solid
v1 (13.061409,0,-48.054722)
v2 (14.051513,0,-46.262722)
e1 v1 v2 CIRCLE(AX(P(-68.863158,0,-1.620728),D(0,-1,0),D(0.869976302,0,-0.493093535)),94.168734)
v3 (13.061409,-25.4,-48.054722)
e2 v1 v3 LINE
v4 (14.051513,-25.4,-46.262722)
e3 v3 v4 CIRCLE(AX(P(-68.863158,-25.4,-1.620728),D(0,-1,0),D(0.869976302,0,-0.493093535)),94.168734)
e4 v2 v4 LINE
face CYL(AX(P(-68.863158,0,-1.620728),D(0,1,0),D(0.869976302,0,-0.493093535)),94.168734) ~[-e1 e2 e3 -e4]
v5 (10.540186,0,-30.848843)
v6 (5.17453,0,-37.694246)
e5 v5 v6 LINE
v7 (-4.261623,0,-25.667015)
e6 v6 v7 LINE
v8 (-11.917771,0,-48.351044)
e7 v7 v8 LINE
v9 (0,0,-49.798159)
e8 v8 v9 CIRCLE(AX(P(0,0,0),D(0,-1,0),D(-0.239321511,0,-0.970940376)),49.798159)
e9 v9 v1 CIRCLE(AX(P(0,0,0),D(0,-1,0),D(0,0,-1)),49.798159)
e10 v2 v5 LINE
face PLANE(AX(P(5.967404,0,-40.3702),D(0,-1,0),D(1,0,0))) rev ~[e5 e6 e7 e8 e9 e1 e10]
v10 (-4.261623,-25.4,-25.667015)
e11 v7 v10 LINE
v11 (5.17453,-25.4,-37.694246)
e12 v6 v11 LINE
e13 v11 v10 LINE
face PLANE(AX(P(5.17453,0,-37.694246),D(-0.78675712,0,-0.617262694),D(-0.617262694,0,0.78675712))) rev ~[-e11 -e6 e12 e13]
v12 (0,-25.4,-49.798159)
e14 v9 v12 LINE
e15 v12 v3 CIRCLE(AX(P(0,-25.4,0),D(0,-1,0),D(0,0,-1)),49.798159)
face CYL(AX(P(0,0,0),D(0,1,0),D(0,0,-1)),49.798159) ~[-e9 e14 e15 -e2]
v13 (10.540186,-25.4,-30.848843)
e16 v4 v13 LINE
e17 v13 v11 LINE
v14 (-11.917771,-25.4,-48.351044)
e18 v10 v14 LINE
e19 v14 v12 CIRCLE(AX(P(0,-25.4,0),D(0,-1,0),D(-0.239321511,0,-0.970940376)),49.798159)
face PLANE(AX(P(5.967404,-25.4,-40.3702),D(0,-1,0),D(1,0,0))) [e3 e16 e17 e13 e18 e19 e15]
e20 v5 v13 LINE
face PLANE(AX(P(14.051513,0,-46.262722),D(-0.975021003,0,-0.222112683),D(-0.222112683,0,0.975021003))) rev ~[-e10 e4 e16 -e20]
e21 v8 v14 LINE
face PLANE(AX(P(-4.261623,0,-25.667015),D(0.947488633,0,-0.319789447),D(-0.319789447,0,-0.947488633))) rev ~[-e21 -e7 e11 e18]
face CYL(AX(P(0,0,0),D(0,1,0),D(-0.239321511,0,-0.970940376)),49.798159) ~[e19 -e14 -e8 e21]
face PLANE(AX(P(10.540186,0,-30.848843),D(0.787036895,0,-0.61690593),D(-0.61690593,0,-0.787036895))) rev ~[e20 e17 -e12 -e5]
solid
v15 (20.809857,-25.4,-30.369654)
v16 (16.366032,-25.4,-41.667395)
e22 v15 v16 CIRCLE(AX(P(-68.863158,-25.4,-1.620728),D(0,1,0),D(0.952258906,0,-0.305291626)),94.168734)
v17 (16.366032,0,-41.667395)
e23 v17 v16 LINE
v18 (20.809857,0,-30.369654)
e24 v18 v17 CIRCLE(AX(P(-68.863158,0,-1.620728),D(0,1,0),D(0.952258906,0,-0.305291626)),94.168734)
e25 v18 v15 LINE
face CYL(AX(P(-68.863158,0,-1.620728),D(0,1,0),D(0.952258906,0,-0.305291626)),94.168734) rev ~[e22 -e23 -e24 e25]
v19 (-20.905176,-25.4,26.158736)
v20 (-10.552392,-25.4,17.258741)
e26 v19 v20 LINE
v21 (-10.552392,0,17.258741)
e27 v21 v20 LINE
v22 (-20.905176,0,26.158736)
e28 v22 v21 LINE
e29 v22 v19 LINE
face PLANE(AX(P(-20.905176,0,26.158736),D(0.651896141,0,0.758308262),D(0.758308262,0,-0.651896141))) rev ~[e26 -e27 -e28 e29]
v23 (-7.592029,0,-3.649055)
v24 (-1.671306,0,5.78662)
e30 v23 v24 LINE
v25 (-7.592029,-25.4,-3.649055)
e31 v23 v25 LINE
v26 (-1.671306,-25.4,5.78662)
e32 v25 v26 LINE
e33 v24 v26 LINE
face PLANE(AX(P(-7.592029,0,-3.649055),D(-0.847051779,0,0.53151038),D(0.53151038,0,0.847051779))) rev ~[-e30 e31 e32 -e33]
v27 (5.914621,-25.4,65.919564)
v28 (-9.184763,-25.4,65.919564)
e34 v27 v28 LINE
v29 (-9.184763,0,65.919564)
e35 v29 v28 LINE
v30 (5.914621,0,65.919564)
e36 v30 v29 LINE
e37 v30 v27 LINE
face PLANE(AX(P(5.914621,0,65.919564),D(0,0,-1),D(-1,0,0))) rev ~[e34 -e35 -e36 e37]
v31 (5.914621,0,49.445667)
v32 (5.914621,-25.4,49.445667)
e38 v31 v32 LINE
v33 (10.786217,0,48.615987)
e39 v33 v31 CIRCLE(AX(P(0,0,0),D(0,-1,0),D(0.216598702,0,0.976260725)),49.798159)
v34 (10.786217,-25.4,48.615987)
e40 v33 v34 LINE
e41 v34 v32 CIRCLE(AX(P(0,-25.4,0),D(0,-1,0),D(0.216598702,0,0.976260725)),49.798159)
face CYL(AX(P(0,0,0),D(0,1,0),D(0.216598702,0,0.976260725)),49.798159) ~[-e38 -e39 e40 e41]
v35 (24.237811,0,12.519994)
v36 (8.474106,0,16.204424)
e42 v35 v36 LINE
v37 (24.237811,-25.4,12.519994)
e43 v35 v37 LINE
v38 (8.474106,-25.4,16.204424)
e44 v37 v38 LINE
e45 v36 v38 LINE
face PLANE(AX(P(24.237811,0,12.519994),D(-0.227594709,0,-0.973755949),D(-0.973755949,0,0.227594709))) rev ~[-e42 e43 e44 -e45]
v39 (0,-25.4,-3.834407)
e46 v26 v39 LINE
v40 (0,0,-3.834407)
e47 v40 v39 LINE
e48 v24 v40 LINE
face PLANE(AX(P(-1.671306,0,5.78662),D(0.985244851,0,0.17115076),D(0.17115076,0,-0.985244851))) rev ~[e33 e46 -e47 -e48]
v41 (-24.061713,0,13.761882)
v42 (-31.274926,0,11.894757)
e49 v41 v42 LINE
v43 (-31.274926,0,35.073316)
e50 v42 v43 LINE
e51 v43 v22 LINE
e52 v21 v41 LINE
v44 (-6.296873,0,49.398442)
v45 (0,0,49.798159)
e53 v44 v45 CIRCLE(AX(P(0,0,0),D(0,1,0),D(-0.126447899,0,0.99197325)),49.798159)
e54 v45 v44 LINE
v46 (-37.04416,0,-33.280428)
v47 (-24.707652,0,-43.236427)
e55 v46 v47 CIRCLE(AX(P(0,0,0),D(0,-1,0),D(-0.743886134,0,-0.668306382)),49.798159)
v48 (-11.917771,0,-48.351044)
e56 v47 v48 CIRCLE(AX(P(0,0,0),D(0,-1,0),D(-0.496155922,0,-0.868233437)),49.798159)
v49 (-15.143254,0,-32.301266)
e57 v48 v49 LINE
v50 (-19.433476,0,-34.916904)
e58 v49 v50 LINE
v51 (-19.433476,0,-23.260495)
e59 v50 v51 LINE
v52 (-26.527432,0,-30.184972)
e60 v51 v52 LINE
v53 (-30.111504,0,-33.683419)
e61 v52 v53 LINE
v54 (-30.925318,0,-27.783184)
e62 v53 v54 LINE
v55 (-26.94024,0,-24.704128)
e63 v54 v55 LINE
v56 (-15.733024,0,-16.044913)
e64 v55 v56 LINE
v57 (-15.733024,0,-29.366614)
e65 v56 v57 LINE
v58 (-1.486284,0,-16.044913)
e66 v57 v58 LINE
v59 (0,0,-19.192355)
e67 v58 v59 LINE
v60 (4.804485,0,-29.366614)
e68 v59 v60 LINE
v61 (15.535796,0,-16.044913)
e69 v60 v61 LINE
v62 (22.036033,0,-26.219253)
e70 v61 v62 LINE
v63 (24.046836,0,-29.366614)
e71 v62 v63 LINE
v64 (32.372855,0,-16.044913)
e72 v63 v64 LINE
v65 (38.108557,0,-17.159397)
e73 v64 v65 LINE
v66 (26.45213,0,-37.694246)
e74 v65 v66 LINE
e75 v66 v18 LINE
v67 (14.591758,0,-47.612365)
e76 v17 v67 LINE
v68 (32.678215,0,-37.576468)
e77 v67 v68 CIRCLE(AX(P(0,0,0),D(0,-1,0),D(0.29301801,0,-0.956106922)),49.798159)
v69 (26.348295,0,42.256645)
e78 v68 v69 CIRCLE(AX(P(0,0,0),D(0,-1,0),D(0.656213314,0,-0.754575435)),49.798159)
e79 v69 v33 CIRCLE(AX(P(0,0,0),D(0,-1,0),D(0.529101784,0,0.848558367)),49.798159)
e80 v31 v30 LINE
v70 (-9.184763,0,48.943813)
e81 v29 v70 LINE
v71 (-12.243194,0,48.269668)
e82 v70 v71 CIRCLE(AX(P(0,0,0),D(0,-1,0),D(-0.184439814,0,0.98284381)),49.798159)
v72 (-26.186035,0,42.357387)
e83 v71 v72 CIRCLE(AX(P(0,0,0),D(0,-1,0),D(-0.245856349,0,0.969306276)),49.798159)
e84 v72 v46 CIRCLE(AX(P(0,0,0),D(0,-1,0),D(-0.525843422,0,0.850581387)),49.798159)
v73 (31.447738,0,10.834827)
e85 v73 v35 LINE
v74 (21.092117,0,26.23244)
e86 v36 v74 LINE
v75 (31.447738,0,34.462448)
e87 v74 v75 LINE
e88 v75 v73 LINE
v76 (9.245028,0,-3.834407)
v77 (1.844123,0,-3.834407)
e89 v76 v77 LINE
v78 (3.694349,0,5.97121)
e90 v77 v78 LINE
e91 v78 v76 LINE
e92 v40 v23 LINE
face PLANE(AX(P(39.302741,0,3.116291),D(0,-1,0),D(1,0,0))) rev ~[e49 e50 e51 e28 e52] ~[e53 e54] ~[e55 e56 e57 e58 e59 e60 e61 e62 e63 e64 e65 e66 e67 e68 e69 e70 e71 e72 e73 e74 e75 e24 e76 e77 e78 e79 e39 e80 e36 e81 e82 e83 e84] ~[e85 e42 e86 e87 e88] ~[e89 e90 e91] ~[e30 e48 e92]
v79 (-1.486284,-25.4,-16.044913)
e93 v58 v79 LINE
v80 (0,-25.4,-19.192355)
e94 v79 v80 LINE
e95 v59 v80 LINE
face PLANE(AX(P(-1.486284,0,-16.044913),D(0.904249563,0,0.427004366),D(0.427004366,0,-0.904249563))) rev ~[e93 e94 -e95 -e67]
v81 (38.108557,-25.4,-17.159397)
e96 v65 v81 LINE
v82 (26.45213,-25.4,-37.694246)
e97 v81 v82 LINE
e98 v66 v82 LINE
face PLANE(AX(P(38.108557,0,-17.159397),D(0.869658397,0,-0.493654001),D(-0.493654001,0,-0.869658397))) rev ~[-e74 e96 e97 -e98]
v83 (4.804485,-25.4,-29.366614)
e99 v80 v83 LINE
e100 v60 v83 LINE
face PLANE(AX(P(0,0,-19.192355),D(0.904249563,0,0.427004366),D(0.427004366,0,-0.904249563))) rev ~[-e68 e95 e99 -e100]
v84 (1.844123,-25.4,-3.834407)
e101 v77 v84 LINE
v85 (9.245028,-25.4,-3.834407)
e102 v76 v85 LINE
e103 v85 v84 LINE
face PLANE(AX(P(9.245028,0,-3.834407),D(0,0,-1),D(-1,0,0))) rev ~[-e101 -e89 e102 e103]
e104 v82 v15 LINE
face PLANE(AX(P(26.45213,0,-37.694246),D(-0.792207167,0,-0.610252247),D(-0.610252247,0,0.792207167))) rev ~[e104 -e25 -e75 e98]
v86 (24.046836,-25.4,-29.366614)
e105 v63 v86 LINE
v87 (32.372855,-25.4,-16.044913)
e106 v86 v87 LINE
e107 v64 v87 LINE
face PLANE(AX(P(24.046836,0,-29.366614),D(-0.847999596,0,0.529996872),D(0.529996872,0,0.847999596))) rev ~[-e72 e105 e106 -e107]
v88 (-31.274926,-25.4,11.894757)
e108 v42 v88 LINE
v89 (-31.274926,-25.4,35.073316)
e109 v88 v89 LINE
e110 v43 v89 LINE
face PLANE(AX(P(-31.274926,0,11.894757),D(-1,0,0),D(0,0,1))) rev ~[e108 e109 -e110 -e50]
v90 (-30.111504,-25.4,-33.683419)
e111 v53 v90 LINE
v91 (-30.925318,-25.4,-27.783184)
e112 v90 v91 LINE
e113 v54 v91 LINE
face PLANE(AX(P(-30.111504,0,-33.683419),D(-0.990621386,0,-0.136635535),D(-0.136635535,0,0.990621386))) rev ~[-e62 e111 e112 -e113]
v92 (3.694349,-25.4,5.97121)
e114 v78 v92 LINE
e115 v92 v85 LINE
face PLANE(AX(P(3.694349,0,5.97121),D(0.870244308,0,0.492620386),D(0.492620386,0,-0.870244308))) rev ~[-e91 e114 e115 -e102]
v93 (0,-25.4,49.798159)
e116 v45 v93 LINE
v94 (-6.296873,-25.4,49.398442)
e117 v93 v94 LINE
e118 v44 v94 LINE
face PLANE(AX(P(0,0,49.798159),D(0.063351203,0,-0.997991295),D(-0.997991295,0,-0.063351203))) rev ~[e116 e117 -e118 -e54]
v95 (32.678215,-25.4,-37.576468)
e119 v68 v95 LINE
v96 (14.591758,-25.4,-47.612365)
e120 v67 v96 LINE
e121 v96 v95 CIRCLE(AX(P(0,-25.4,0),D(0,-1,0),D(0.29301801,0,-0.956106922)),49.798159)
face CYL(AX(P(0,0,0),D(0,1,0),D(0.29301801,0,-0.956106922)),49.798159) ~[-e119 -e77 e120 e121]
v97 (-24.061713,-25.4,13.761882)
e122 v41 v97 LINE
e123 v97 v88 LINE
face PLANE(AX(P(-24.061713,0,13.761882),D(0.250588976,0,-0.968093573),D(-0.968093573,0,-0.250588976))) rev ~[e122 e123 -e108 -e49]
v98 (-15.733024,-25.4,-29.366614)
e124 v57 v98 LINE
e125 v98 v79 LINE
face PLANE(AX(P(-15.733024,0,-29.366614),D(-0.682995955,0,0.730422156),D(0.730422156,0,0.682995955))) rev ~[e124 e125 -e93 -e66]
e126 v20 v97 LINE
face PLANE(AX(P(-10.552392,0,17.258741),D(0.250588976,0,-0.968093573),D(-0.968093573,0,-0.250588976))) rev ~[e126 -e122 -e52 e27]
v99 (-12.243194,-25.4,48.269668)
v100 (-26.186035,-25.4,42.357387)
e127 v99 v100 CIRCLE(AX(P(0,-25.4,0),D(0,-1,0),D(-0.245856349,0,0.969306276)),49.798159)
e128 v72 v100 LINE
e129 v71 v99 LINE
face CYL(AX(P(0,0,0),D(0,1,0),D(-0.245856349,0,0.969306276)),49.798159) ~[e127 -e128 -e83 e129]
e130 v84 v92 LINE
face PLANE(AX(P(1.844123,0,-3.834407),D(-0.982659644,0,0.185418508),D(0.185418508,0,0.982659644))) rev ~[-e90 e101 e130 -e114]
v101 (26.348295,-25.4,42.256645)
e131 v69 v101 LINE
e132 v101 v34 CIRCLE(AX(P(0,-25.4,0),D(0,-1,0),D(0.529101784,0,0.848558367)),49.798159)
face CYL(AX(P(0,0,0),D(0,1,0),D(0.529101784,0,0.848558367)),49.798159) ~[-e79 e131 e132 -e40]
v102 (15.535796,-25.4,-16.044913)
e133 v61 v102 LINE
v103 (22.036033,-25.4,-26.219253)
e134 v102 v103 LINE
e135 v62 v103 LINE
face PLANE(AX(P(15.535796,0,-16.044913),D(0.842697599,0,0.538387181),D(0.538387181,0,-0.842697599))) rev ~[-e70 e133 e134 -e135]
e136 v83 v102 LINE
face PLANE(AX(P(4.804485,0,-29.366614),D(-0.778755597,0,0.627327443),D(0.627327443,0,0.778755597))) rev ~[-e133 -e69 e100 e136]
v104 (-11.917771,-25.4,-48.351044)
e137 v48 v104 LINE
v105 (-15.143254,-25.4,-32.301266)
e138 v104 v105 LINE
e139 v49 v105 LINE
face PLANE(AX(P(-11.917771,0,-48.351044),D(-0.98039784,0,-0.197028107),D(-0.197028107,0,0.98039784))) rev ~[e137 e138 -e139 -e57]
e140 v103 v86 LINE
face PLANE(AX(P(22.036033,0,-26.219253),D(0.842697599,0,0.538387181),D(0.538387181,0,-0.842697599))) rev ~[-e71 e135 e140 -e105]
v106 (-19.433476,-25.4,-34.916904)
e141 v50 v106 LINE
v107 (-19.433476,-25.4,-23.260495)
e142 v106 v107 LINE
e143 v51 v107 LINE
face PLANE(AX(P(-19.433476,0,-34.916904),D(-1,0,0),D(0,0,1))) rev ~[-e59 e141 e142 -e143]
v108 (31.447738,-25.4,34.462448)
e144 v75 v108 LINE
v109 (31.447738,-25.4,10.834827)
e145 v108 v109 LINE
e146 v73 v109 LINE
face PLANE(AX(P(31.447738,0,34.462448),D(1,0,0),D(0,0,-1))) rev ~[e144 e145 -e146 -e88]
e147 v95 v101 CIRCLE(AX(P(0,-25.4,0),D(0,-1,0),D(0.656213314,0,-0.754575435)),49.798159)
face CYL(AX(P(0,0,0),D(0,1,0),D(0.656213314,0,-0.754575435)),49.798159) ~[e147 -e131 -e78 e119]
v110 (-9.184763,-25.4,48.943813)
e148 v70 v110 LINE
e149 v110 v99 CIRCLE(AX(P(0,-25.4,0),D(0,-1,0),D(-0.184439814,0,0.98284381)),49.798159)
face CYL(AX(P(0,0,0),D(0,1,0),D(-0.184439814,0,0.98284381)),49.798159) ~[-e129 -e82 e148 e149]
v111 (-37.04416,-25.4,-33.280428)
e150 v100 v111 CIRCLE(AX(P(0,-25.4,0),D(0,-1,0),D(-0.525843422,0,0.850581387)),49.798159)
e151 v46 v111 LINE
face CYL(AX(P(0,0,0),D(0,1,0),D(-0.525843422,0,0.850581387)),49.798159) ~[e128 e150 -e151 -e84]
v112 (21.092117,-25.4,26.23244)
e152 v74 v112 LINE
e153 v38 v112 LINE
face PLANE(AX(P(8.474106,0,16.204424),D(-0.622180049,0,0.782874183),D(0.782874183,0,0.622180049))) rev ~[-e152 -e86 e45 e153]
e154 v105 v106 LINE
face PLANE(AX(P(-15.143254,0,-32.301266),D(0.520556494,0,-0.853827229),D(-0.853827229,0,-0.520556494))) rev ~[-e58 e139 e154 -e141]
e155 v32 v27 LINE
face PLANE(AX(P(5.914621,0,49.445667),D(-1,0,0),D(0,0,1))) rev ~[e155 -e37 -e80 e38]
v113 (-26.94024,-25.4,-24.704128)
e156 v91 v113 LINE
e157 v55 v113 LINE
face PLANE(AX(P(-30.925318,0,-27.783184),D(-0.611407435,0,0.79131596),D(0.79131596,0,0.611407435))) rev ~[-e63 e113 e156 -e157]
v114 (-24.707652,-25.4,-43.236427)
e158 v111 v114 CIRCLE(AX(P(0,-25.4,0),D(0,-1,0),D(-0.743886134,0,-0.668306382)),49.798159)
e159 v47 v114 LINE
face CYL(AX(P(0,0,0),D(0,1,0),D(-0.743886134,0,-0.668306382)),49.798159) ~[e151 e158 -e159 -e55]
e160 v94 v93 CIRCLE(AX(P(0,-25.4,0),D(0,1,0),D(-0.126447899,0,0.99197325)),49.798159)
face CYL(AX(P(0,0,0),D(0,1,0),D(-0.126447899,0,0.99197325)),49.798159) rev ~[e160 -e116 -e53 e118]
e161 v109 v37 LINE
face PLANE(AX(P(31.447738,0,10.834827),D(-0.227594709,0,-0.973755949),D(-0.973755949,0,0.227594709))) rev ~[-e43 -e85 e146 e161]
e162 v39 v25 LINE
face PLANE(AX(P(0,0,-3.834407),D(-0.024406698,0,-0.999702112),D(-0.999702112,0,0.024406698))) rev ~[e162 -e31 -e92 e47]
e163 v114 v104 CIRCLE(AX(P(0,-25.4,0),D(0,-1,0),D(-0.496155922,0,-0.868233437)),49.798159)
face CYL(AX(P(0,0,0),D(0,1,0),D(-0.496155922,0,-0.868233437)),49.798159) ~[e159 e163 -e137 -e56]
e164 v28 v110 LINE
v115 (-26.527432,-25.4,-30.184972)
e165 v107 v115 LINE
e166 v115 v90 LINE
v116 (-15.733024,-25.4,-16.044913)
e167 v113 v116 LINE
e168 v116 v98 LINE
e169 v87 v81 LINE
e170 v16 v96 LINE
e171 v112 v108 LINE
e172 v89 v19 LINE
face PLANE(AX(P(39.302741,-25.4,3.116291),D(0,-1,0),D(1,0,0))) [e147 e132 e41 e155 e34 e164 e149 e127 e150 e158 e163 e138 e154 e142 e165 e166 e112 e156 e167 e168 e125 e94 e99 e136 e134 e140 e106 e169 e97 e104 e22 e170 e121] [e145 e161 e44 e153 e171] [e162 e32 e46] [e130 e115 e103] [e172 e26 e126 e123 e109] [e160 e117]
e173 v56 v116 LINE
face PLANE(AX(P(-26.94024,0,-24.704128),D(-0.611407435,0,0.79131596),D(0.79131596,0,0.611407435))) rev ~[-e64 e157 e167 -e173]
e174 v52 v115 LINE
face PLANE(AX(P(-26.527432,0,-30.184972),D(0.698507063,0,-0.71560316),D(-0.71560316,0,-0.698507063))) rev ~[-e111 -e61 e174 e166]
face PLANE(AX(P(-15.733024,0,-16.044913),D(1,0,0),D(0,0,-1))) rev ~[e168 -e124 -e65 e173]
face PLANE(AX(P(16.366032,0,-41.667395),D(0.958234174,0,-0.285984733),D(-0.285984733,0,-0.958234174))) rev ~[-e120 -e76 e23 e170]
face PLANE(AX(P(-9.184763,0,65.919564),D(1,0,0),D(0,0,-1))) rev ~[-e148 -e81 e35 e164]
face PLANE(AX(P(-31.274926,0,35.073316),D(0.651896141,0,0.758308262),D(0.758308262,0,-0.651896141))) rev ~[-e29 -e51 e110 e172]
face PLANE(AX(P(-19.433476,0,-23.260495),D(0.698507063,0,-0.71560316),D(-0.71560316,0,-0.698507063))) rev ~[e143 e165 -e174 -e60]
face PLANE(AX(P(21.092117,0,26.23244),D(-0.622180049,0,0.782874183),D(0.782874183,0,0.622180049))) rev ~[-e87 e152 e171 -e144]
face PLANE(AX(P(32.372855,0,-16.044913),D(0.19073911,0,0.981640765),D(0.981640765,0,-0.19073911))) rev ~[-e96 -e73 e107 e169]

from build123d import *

# Parameters (mm, degrees)
F1_DEPTH = 25.4


with BuildPart() as f1:
    # F0 (on Front) → F1 (new body)
    with BuildSketch(Plane.XZ):
        with BuildLine():
            ThreePointArc((32.6782151723, -37.5764677752), (45.3165071723, -20.6463278819), (49.7981593767, 0))
            ThreePointArc((49.7981593767, 0), (43.5428138182, 24.1636098732), (26.3482949877, 42.2566447857))
            ThreePointArc((26.3482949877, 42.2566447857), (42.3711325354, 3.3595819889), (32.6782151723, -37.5764677752))
        make_face()
        with BuildLine():
            ThreePointArc((32.6782151723, -37.5764677752), (42.3711325354, 3.3595819889), (26.3482949877, 42.2566447857))
            ThreePointArc((26.3482949877, 42.2566447857), (18.8375502119, 46.0977589403), (10.7862166768, 48.6159871555))
            ThreePointArc((10.7862166768, 48.6159871555), (16.6744949948, 37.7627754895), (21.092116807, 26.232439738))
            Line((21.092116807, 26.232439738), (31.447738409, 34.4624482095))
            Line((31.447738409, 34.4624482095), (31.447738409, 10.8348272407))
            Line((31.447738409, 10.8348272407), (24.2378107652, 12.519994233))
            ThreePointArc((24.2378107652, 12.519994233), (25.1538459711, -6.9642629039), (22.0360332318, -26.2192529167))
            Line((22.0360332318, -26.2192529167), (24.0468364209, -29.366614297))
            Line((24.0468364209, -29.366614297), (32.37285465, -16.0449128598))
            Line((32.37285465, -16.0449128598), (38.1085574627, -17.1593967825))
            Line((38.1085574627, -17.1593967825), (26.4521297067, -37.6942455769))
            Line((26.4521297067, -37.6942455769), (20.8098572617, -30.369653677))
            ThreePointArc((20.8098572617, -30.369653677), (18.7701982142, -36.0902111883), (16.3660323787, -41.6673945191))
            Line((16.3660323787, -41.6673945191), (14.5917575654, -47.6123648694))
            ThreePointArc((14.5917575654, -47.6123648694), (24.1617960482, -43.5438203311), (32.6782151723, -37.5764677752))
        make_face()
        with BuildLine():
            ThreePointArc((21.092116807, 26.232439738), (16.6744949948, 37.7627754895), (10.7862166768, 48.6159871555))
            ThreePointArc((10.7862166768, 48.6159871555), (8.3607166752, 49.0912934642), (5.9146205895, 49.4456665502))
            ThreePointArc((5.9146205895, 49.4456665502), (2.9625575062, 49.70995806), (0, 49.7981593767))
            Line((0, 49.7981593767), (0, -3.8344066124))
            Line((0, -3.8344066124), (0, -19.1923552025))
            Line((0, -19.1923552025), (4.8044845462, -29.366614297))
            Line((4.8044845462, -29.366614297), (15.5357960612, -16.0449128598))
            Line((15.5357960612, -16.0449128598), (22.0360332318, -26.2192529167))
            ThreePointArc((22.0360332318, -26.2192529167), (25.1538459711, -6.9642629039), (24.2378107652, 12.519994233))
            Line((24.2378107652, 12.519994233), (8.4741063403, 16.204424325))
            Line((8.4741063403, 16.204424325), (21.092116807, 26.232439738))
        make_face()
        Polygon((9.245027788, -3.8344066124), (1.8441228895, -3.8344066124), (3.6943492014, 5.9712096117), align=None, mode=Mode.SUBTRACT)
        with BuildLine():
            ThreePointArc((0, 49.7981593767), (2.9625575062, 49.70995806), (5.9146205895, 49.4456665502))
            Line((5.9146205895, 49.4456665502), (5.9146205895, 65.9195636089))
            Line((5.9146205895, 65.9195636089), (3.1392811798, 65.9195636089))
            Line((3.1392811798, 65.9195636089), (0, 65.9195636089))
            Line((0, 65.9195636089), (0, 49.7981593767))
        make_face()
        with BuildLine():
            Line((0, -3.8344066124), (0, 49.7981593767))
            Line((0, 49.7981593767), (-6.296872627, 49.398442004))
            ThreePointArc((-6.296872627, 49.398442004), (-7.744154843, 49.1923240259), (-9.1847632403, 48.9438126991))
            ThreePointArc((-9.1847632403, 48.9438126991), (-10.7192794325, 48.6307898944), (-12.2431936307, 48.2696683957))
            ThreePointArc((-12.2431936307, 48.2696683957), (-17.0201913462, 37.3889257354), (-20.9051760668, 26.1587359893))
            Line((-20.9051760668, 26.1587359893), (-10.5523923412, 17.2587409616))
            Line((-10.5523923412, 17.2587409616), (-24.0617127081, 13.7618819272))
            ThreePointArc((-24.0617127081, 13.7618819272), (-26.7647104228, -5.37655391), (-26.9402397571, -24.7041277979))
            Line((-26.9402397571, -24.7041277979), (-15.7330241054, -16.0449128598))
            Line((-15.7330241054, -16.0449128598), (-15.7330241054, -29.366614297))
            Line((-15.7330241054, -29.366614297), (-1.4862839598, -16.0449128598))
            Line((-1.4862839598, -16.0449128598), (0, -19.1923552025))
            Line((0, -19.1923552025), (0, -3.8344066124))
        make_face()
        Polygon((-1.6713063233, 5.7866196148), (0, -3.8344066124), (-7.5920294039, -3.6490550265), align=None, mode=Mode.SUBTRACT)
        with BuildLine():
            ThreePointArc((-6.296872627, 49.398442004), (-3.1547733222, 49.6981295683), (0, 49.7981593767))
            Line((0, 49.7981593767), (0, 65.9195636089))
            Line((0, 65.9195636089), (-3.1484363135, 65.9195636089))
            Line((-3.1484363135, 65.9195636089), (-6.296872627, 65.9195636089))
            Line((-6.296872627, 65.9195636089), (-6.296872627, 49.398442004))
        make_face()
        with BuildLine():
            ThreePointArc((-9.1847632403, 48.9438126991), (-7.744154843, 49.1923240259), (-6.296872627, 49.398442004))
            Line((-6.296872627, 49.398442004), (-6.296872627, 65.9195636089))
            Line((-6.296872627, 65.9195636089), (-9.1847632403, 65.9195636089))
            Line((-9.1847632403, 65.9195636089), (-9.1847632403, 48.9438126991))
        make_face()
        with BuildLine():
            ThreePointArc((-24.7076516572, -43.2364270829), (-18.4904087752, -46.2380953396), (-11.9177707221, -48.3510436115))
            Line((-11.9177707221, -48.3510436115), (-15.1432544542, -32.3012661093))
            Line((-15.1432544542, -32.3012661093), (-19.4334760308, -34.9169038236))
            Line((-19.4334760308, -34.9169038236), (-19.4334760308, -23.2604946941))
            Line((-19.4334760308, -23.2604946941), (-26.5274317789, -30.1849724934))
            ThreePointArc((-26.5274317789, -30.1849724934), (-25.7634681206, -36.7310464832), (-24.7076516572, -43.2364270829))
        make_face()
        with BuildLine():
            ThreePointArc((-20.9051760668, 26.1587359893), (-17.0201913462, 37.3889257354), (-12.2431936307, 48.2696683957))
            ThreePointArc((-12.2431936307, 48.2696683957), (-19.4406831361, 45.8466630902), (-26.1860345343, 42.3573874628))
            ThreePointArc((-26.1860345343, 42.3573874628), (-41.8830905525, 6.0124933669), (-37.0441602385, -33.2804277246))
            ThreePointArc((-37.0441602385, -33.2804277246), (-31.2746230818, -38.7524789968), (-24.7076516572, -43.2364270829))
            ThreePointArc((-24.7076516572, -43.2364270829), (-25.7634681206, -36.7310464832), (-26.5274317789, -30.1849724934))
            Line((-26.5274317789, -30.1849724934), (-30.1115038325, -33.6834193751))
            Line((-30.1115038325, -33.6834193751), (-30.925318067, -27.7831842472))
            Line((-30.925318067, -27.7831842472), (-26.9402397571, -24.7041277979))
            ThreePointArc((-26.9402397571, -24.7041277979), (-26.7647104228, -5.37655391), (-24.0617127081, 13.7618819272))
            Line((-24.0617127081, 13.7618819272), (-31.2749259174, 11.8947569281))
            Line((-31.2749259174, 11.8947569281), (-31.2749259174, 35.0733163144))
            Line((-31.2749259174, 35.0733163144), (-20.9051760668, 26.1587359893))
        make_face()
        with BuildLine():
            ThreePointArc((-37.0441602385, -33.2804277246), (-41.8830905525, 6.0124933669), (-26.1860345343, 42.3573874628))
            ThreePointArc((-26.1860345343, 42.3573874628), (-49.292840802, 7.0761941024), (-37.0441602385, -33.2804277246))
        make_face()
    extrude(amount=F1_DEPTH)


with BuildPart() as f1b:
    # F0 (on Front) → F1, piece 2 (new body)
    with BuildSketch(Plane.XZ):
        with BuildLine():
            ThreePointArc((0, -49.7981593767), (6.5886259942, -49.3603756551), (13.0614086221, -48.0547217463))
            ThreePointArc((13.0614086221, -48.0547217463), (13.5613311897, -47.1614128137), (14.0515134569, -46.2627222288))
            Line((14.0515134569, -46.2627222288), (10.5401859619, -30.8488430455))
            Line((10.5401859619, -30.8488430455), (5.1745297387, -37.6942455769))
            Line((5.1745297387, -37.6942455769), (0, -31.0988395126))
            Line((0, -31.0988395126), (0, -49.7981593767))
        make_face()
        with BuildLine():
            ThreePointArc((-11.9177707221, -48.3510436115), (-6.0026536428, -49.4350566557), (0, -49.7981593767))
            Line((0, -49.7981593767), (0, -31.0988395126))
            Line((0, -31.0988395126), (-4.2616231367, -25.6670154631))
            Line((-4.2616231367, -25.6670154631), (-11.9177707221, -48.3510436115))
        make_face()
    extrude(amount=F1_DEPTH)


solid = Compound([f1.part, f1b.part])
